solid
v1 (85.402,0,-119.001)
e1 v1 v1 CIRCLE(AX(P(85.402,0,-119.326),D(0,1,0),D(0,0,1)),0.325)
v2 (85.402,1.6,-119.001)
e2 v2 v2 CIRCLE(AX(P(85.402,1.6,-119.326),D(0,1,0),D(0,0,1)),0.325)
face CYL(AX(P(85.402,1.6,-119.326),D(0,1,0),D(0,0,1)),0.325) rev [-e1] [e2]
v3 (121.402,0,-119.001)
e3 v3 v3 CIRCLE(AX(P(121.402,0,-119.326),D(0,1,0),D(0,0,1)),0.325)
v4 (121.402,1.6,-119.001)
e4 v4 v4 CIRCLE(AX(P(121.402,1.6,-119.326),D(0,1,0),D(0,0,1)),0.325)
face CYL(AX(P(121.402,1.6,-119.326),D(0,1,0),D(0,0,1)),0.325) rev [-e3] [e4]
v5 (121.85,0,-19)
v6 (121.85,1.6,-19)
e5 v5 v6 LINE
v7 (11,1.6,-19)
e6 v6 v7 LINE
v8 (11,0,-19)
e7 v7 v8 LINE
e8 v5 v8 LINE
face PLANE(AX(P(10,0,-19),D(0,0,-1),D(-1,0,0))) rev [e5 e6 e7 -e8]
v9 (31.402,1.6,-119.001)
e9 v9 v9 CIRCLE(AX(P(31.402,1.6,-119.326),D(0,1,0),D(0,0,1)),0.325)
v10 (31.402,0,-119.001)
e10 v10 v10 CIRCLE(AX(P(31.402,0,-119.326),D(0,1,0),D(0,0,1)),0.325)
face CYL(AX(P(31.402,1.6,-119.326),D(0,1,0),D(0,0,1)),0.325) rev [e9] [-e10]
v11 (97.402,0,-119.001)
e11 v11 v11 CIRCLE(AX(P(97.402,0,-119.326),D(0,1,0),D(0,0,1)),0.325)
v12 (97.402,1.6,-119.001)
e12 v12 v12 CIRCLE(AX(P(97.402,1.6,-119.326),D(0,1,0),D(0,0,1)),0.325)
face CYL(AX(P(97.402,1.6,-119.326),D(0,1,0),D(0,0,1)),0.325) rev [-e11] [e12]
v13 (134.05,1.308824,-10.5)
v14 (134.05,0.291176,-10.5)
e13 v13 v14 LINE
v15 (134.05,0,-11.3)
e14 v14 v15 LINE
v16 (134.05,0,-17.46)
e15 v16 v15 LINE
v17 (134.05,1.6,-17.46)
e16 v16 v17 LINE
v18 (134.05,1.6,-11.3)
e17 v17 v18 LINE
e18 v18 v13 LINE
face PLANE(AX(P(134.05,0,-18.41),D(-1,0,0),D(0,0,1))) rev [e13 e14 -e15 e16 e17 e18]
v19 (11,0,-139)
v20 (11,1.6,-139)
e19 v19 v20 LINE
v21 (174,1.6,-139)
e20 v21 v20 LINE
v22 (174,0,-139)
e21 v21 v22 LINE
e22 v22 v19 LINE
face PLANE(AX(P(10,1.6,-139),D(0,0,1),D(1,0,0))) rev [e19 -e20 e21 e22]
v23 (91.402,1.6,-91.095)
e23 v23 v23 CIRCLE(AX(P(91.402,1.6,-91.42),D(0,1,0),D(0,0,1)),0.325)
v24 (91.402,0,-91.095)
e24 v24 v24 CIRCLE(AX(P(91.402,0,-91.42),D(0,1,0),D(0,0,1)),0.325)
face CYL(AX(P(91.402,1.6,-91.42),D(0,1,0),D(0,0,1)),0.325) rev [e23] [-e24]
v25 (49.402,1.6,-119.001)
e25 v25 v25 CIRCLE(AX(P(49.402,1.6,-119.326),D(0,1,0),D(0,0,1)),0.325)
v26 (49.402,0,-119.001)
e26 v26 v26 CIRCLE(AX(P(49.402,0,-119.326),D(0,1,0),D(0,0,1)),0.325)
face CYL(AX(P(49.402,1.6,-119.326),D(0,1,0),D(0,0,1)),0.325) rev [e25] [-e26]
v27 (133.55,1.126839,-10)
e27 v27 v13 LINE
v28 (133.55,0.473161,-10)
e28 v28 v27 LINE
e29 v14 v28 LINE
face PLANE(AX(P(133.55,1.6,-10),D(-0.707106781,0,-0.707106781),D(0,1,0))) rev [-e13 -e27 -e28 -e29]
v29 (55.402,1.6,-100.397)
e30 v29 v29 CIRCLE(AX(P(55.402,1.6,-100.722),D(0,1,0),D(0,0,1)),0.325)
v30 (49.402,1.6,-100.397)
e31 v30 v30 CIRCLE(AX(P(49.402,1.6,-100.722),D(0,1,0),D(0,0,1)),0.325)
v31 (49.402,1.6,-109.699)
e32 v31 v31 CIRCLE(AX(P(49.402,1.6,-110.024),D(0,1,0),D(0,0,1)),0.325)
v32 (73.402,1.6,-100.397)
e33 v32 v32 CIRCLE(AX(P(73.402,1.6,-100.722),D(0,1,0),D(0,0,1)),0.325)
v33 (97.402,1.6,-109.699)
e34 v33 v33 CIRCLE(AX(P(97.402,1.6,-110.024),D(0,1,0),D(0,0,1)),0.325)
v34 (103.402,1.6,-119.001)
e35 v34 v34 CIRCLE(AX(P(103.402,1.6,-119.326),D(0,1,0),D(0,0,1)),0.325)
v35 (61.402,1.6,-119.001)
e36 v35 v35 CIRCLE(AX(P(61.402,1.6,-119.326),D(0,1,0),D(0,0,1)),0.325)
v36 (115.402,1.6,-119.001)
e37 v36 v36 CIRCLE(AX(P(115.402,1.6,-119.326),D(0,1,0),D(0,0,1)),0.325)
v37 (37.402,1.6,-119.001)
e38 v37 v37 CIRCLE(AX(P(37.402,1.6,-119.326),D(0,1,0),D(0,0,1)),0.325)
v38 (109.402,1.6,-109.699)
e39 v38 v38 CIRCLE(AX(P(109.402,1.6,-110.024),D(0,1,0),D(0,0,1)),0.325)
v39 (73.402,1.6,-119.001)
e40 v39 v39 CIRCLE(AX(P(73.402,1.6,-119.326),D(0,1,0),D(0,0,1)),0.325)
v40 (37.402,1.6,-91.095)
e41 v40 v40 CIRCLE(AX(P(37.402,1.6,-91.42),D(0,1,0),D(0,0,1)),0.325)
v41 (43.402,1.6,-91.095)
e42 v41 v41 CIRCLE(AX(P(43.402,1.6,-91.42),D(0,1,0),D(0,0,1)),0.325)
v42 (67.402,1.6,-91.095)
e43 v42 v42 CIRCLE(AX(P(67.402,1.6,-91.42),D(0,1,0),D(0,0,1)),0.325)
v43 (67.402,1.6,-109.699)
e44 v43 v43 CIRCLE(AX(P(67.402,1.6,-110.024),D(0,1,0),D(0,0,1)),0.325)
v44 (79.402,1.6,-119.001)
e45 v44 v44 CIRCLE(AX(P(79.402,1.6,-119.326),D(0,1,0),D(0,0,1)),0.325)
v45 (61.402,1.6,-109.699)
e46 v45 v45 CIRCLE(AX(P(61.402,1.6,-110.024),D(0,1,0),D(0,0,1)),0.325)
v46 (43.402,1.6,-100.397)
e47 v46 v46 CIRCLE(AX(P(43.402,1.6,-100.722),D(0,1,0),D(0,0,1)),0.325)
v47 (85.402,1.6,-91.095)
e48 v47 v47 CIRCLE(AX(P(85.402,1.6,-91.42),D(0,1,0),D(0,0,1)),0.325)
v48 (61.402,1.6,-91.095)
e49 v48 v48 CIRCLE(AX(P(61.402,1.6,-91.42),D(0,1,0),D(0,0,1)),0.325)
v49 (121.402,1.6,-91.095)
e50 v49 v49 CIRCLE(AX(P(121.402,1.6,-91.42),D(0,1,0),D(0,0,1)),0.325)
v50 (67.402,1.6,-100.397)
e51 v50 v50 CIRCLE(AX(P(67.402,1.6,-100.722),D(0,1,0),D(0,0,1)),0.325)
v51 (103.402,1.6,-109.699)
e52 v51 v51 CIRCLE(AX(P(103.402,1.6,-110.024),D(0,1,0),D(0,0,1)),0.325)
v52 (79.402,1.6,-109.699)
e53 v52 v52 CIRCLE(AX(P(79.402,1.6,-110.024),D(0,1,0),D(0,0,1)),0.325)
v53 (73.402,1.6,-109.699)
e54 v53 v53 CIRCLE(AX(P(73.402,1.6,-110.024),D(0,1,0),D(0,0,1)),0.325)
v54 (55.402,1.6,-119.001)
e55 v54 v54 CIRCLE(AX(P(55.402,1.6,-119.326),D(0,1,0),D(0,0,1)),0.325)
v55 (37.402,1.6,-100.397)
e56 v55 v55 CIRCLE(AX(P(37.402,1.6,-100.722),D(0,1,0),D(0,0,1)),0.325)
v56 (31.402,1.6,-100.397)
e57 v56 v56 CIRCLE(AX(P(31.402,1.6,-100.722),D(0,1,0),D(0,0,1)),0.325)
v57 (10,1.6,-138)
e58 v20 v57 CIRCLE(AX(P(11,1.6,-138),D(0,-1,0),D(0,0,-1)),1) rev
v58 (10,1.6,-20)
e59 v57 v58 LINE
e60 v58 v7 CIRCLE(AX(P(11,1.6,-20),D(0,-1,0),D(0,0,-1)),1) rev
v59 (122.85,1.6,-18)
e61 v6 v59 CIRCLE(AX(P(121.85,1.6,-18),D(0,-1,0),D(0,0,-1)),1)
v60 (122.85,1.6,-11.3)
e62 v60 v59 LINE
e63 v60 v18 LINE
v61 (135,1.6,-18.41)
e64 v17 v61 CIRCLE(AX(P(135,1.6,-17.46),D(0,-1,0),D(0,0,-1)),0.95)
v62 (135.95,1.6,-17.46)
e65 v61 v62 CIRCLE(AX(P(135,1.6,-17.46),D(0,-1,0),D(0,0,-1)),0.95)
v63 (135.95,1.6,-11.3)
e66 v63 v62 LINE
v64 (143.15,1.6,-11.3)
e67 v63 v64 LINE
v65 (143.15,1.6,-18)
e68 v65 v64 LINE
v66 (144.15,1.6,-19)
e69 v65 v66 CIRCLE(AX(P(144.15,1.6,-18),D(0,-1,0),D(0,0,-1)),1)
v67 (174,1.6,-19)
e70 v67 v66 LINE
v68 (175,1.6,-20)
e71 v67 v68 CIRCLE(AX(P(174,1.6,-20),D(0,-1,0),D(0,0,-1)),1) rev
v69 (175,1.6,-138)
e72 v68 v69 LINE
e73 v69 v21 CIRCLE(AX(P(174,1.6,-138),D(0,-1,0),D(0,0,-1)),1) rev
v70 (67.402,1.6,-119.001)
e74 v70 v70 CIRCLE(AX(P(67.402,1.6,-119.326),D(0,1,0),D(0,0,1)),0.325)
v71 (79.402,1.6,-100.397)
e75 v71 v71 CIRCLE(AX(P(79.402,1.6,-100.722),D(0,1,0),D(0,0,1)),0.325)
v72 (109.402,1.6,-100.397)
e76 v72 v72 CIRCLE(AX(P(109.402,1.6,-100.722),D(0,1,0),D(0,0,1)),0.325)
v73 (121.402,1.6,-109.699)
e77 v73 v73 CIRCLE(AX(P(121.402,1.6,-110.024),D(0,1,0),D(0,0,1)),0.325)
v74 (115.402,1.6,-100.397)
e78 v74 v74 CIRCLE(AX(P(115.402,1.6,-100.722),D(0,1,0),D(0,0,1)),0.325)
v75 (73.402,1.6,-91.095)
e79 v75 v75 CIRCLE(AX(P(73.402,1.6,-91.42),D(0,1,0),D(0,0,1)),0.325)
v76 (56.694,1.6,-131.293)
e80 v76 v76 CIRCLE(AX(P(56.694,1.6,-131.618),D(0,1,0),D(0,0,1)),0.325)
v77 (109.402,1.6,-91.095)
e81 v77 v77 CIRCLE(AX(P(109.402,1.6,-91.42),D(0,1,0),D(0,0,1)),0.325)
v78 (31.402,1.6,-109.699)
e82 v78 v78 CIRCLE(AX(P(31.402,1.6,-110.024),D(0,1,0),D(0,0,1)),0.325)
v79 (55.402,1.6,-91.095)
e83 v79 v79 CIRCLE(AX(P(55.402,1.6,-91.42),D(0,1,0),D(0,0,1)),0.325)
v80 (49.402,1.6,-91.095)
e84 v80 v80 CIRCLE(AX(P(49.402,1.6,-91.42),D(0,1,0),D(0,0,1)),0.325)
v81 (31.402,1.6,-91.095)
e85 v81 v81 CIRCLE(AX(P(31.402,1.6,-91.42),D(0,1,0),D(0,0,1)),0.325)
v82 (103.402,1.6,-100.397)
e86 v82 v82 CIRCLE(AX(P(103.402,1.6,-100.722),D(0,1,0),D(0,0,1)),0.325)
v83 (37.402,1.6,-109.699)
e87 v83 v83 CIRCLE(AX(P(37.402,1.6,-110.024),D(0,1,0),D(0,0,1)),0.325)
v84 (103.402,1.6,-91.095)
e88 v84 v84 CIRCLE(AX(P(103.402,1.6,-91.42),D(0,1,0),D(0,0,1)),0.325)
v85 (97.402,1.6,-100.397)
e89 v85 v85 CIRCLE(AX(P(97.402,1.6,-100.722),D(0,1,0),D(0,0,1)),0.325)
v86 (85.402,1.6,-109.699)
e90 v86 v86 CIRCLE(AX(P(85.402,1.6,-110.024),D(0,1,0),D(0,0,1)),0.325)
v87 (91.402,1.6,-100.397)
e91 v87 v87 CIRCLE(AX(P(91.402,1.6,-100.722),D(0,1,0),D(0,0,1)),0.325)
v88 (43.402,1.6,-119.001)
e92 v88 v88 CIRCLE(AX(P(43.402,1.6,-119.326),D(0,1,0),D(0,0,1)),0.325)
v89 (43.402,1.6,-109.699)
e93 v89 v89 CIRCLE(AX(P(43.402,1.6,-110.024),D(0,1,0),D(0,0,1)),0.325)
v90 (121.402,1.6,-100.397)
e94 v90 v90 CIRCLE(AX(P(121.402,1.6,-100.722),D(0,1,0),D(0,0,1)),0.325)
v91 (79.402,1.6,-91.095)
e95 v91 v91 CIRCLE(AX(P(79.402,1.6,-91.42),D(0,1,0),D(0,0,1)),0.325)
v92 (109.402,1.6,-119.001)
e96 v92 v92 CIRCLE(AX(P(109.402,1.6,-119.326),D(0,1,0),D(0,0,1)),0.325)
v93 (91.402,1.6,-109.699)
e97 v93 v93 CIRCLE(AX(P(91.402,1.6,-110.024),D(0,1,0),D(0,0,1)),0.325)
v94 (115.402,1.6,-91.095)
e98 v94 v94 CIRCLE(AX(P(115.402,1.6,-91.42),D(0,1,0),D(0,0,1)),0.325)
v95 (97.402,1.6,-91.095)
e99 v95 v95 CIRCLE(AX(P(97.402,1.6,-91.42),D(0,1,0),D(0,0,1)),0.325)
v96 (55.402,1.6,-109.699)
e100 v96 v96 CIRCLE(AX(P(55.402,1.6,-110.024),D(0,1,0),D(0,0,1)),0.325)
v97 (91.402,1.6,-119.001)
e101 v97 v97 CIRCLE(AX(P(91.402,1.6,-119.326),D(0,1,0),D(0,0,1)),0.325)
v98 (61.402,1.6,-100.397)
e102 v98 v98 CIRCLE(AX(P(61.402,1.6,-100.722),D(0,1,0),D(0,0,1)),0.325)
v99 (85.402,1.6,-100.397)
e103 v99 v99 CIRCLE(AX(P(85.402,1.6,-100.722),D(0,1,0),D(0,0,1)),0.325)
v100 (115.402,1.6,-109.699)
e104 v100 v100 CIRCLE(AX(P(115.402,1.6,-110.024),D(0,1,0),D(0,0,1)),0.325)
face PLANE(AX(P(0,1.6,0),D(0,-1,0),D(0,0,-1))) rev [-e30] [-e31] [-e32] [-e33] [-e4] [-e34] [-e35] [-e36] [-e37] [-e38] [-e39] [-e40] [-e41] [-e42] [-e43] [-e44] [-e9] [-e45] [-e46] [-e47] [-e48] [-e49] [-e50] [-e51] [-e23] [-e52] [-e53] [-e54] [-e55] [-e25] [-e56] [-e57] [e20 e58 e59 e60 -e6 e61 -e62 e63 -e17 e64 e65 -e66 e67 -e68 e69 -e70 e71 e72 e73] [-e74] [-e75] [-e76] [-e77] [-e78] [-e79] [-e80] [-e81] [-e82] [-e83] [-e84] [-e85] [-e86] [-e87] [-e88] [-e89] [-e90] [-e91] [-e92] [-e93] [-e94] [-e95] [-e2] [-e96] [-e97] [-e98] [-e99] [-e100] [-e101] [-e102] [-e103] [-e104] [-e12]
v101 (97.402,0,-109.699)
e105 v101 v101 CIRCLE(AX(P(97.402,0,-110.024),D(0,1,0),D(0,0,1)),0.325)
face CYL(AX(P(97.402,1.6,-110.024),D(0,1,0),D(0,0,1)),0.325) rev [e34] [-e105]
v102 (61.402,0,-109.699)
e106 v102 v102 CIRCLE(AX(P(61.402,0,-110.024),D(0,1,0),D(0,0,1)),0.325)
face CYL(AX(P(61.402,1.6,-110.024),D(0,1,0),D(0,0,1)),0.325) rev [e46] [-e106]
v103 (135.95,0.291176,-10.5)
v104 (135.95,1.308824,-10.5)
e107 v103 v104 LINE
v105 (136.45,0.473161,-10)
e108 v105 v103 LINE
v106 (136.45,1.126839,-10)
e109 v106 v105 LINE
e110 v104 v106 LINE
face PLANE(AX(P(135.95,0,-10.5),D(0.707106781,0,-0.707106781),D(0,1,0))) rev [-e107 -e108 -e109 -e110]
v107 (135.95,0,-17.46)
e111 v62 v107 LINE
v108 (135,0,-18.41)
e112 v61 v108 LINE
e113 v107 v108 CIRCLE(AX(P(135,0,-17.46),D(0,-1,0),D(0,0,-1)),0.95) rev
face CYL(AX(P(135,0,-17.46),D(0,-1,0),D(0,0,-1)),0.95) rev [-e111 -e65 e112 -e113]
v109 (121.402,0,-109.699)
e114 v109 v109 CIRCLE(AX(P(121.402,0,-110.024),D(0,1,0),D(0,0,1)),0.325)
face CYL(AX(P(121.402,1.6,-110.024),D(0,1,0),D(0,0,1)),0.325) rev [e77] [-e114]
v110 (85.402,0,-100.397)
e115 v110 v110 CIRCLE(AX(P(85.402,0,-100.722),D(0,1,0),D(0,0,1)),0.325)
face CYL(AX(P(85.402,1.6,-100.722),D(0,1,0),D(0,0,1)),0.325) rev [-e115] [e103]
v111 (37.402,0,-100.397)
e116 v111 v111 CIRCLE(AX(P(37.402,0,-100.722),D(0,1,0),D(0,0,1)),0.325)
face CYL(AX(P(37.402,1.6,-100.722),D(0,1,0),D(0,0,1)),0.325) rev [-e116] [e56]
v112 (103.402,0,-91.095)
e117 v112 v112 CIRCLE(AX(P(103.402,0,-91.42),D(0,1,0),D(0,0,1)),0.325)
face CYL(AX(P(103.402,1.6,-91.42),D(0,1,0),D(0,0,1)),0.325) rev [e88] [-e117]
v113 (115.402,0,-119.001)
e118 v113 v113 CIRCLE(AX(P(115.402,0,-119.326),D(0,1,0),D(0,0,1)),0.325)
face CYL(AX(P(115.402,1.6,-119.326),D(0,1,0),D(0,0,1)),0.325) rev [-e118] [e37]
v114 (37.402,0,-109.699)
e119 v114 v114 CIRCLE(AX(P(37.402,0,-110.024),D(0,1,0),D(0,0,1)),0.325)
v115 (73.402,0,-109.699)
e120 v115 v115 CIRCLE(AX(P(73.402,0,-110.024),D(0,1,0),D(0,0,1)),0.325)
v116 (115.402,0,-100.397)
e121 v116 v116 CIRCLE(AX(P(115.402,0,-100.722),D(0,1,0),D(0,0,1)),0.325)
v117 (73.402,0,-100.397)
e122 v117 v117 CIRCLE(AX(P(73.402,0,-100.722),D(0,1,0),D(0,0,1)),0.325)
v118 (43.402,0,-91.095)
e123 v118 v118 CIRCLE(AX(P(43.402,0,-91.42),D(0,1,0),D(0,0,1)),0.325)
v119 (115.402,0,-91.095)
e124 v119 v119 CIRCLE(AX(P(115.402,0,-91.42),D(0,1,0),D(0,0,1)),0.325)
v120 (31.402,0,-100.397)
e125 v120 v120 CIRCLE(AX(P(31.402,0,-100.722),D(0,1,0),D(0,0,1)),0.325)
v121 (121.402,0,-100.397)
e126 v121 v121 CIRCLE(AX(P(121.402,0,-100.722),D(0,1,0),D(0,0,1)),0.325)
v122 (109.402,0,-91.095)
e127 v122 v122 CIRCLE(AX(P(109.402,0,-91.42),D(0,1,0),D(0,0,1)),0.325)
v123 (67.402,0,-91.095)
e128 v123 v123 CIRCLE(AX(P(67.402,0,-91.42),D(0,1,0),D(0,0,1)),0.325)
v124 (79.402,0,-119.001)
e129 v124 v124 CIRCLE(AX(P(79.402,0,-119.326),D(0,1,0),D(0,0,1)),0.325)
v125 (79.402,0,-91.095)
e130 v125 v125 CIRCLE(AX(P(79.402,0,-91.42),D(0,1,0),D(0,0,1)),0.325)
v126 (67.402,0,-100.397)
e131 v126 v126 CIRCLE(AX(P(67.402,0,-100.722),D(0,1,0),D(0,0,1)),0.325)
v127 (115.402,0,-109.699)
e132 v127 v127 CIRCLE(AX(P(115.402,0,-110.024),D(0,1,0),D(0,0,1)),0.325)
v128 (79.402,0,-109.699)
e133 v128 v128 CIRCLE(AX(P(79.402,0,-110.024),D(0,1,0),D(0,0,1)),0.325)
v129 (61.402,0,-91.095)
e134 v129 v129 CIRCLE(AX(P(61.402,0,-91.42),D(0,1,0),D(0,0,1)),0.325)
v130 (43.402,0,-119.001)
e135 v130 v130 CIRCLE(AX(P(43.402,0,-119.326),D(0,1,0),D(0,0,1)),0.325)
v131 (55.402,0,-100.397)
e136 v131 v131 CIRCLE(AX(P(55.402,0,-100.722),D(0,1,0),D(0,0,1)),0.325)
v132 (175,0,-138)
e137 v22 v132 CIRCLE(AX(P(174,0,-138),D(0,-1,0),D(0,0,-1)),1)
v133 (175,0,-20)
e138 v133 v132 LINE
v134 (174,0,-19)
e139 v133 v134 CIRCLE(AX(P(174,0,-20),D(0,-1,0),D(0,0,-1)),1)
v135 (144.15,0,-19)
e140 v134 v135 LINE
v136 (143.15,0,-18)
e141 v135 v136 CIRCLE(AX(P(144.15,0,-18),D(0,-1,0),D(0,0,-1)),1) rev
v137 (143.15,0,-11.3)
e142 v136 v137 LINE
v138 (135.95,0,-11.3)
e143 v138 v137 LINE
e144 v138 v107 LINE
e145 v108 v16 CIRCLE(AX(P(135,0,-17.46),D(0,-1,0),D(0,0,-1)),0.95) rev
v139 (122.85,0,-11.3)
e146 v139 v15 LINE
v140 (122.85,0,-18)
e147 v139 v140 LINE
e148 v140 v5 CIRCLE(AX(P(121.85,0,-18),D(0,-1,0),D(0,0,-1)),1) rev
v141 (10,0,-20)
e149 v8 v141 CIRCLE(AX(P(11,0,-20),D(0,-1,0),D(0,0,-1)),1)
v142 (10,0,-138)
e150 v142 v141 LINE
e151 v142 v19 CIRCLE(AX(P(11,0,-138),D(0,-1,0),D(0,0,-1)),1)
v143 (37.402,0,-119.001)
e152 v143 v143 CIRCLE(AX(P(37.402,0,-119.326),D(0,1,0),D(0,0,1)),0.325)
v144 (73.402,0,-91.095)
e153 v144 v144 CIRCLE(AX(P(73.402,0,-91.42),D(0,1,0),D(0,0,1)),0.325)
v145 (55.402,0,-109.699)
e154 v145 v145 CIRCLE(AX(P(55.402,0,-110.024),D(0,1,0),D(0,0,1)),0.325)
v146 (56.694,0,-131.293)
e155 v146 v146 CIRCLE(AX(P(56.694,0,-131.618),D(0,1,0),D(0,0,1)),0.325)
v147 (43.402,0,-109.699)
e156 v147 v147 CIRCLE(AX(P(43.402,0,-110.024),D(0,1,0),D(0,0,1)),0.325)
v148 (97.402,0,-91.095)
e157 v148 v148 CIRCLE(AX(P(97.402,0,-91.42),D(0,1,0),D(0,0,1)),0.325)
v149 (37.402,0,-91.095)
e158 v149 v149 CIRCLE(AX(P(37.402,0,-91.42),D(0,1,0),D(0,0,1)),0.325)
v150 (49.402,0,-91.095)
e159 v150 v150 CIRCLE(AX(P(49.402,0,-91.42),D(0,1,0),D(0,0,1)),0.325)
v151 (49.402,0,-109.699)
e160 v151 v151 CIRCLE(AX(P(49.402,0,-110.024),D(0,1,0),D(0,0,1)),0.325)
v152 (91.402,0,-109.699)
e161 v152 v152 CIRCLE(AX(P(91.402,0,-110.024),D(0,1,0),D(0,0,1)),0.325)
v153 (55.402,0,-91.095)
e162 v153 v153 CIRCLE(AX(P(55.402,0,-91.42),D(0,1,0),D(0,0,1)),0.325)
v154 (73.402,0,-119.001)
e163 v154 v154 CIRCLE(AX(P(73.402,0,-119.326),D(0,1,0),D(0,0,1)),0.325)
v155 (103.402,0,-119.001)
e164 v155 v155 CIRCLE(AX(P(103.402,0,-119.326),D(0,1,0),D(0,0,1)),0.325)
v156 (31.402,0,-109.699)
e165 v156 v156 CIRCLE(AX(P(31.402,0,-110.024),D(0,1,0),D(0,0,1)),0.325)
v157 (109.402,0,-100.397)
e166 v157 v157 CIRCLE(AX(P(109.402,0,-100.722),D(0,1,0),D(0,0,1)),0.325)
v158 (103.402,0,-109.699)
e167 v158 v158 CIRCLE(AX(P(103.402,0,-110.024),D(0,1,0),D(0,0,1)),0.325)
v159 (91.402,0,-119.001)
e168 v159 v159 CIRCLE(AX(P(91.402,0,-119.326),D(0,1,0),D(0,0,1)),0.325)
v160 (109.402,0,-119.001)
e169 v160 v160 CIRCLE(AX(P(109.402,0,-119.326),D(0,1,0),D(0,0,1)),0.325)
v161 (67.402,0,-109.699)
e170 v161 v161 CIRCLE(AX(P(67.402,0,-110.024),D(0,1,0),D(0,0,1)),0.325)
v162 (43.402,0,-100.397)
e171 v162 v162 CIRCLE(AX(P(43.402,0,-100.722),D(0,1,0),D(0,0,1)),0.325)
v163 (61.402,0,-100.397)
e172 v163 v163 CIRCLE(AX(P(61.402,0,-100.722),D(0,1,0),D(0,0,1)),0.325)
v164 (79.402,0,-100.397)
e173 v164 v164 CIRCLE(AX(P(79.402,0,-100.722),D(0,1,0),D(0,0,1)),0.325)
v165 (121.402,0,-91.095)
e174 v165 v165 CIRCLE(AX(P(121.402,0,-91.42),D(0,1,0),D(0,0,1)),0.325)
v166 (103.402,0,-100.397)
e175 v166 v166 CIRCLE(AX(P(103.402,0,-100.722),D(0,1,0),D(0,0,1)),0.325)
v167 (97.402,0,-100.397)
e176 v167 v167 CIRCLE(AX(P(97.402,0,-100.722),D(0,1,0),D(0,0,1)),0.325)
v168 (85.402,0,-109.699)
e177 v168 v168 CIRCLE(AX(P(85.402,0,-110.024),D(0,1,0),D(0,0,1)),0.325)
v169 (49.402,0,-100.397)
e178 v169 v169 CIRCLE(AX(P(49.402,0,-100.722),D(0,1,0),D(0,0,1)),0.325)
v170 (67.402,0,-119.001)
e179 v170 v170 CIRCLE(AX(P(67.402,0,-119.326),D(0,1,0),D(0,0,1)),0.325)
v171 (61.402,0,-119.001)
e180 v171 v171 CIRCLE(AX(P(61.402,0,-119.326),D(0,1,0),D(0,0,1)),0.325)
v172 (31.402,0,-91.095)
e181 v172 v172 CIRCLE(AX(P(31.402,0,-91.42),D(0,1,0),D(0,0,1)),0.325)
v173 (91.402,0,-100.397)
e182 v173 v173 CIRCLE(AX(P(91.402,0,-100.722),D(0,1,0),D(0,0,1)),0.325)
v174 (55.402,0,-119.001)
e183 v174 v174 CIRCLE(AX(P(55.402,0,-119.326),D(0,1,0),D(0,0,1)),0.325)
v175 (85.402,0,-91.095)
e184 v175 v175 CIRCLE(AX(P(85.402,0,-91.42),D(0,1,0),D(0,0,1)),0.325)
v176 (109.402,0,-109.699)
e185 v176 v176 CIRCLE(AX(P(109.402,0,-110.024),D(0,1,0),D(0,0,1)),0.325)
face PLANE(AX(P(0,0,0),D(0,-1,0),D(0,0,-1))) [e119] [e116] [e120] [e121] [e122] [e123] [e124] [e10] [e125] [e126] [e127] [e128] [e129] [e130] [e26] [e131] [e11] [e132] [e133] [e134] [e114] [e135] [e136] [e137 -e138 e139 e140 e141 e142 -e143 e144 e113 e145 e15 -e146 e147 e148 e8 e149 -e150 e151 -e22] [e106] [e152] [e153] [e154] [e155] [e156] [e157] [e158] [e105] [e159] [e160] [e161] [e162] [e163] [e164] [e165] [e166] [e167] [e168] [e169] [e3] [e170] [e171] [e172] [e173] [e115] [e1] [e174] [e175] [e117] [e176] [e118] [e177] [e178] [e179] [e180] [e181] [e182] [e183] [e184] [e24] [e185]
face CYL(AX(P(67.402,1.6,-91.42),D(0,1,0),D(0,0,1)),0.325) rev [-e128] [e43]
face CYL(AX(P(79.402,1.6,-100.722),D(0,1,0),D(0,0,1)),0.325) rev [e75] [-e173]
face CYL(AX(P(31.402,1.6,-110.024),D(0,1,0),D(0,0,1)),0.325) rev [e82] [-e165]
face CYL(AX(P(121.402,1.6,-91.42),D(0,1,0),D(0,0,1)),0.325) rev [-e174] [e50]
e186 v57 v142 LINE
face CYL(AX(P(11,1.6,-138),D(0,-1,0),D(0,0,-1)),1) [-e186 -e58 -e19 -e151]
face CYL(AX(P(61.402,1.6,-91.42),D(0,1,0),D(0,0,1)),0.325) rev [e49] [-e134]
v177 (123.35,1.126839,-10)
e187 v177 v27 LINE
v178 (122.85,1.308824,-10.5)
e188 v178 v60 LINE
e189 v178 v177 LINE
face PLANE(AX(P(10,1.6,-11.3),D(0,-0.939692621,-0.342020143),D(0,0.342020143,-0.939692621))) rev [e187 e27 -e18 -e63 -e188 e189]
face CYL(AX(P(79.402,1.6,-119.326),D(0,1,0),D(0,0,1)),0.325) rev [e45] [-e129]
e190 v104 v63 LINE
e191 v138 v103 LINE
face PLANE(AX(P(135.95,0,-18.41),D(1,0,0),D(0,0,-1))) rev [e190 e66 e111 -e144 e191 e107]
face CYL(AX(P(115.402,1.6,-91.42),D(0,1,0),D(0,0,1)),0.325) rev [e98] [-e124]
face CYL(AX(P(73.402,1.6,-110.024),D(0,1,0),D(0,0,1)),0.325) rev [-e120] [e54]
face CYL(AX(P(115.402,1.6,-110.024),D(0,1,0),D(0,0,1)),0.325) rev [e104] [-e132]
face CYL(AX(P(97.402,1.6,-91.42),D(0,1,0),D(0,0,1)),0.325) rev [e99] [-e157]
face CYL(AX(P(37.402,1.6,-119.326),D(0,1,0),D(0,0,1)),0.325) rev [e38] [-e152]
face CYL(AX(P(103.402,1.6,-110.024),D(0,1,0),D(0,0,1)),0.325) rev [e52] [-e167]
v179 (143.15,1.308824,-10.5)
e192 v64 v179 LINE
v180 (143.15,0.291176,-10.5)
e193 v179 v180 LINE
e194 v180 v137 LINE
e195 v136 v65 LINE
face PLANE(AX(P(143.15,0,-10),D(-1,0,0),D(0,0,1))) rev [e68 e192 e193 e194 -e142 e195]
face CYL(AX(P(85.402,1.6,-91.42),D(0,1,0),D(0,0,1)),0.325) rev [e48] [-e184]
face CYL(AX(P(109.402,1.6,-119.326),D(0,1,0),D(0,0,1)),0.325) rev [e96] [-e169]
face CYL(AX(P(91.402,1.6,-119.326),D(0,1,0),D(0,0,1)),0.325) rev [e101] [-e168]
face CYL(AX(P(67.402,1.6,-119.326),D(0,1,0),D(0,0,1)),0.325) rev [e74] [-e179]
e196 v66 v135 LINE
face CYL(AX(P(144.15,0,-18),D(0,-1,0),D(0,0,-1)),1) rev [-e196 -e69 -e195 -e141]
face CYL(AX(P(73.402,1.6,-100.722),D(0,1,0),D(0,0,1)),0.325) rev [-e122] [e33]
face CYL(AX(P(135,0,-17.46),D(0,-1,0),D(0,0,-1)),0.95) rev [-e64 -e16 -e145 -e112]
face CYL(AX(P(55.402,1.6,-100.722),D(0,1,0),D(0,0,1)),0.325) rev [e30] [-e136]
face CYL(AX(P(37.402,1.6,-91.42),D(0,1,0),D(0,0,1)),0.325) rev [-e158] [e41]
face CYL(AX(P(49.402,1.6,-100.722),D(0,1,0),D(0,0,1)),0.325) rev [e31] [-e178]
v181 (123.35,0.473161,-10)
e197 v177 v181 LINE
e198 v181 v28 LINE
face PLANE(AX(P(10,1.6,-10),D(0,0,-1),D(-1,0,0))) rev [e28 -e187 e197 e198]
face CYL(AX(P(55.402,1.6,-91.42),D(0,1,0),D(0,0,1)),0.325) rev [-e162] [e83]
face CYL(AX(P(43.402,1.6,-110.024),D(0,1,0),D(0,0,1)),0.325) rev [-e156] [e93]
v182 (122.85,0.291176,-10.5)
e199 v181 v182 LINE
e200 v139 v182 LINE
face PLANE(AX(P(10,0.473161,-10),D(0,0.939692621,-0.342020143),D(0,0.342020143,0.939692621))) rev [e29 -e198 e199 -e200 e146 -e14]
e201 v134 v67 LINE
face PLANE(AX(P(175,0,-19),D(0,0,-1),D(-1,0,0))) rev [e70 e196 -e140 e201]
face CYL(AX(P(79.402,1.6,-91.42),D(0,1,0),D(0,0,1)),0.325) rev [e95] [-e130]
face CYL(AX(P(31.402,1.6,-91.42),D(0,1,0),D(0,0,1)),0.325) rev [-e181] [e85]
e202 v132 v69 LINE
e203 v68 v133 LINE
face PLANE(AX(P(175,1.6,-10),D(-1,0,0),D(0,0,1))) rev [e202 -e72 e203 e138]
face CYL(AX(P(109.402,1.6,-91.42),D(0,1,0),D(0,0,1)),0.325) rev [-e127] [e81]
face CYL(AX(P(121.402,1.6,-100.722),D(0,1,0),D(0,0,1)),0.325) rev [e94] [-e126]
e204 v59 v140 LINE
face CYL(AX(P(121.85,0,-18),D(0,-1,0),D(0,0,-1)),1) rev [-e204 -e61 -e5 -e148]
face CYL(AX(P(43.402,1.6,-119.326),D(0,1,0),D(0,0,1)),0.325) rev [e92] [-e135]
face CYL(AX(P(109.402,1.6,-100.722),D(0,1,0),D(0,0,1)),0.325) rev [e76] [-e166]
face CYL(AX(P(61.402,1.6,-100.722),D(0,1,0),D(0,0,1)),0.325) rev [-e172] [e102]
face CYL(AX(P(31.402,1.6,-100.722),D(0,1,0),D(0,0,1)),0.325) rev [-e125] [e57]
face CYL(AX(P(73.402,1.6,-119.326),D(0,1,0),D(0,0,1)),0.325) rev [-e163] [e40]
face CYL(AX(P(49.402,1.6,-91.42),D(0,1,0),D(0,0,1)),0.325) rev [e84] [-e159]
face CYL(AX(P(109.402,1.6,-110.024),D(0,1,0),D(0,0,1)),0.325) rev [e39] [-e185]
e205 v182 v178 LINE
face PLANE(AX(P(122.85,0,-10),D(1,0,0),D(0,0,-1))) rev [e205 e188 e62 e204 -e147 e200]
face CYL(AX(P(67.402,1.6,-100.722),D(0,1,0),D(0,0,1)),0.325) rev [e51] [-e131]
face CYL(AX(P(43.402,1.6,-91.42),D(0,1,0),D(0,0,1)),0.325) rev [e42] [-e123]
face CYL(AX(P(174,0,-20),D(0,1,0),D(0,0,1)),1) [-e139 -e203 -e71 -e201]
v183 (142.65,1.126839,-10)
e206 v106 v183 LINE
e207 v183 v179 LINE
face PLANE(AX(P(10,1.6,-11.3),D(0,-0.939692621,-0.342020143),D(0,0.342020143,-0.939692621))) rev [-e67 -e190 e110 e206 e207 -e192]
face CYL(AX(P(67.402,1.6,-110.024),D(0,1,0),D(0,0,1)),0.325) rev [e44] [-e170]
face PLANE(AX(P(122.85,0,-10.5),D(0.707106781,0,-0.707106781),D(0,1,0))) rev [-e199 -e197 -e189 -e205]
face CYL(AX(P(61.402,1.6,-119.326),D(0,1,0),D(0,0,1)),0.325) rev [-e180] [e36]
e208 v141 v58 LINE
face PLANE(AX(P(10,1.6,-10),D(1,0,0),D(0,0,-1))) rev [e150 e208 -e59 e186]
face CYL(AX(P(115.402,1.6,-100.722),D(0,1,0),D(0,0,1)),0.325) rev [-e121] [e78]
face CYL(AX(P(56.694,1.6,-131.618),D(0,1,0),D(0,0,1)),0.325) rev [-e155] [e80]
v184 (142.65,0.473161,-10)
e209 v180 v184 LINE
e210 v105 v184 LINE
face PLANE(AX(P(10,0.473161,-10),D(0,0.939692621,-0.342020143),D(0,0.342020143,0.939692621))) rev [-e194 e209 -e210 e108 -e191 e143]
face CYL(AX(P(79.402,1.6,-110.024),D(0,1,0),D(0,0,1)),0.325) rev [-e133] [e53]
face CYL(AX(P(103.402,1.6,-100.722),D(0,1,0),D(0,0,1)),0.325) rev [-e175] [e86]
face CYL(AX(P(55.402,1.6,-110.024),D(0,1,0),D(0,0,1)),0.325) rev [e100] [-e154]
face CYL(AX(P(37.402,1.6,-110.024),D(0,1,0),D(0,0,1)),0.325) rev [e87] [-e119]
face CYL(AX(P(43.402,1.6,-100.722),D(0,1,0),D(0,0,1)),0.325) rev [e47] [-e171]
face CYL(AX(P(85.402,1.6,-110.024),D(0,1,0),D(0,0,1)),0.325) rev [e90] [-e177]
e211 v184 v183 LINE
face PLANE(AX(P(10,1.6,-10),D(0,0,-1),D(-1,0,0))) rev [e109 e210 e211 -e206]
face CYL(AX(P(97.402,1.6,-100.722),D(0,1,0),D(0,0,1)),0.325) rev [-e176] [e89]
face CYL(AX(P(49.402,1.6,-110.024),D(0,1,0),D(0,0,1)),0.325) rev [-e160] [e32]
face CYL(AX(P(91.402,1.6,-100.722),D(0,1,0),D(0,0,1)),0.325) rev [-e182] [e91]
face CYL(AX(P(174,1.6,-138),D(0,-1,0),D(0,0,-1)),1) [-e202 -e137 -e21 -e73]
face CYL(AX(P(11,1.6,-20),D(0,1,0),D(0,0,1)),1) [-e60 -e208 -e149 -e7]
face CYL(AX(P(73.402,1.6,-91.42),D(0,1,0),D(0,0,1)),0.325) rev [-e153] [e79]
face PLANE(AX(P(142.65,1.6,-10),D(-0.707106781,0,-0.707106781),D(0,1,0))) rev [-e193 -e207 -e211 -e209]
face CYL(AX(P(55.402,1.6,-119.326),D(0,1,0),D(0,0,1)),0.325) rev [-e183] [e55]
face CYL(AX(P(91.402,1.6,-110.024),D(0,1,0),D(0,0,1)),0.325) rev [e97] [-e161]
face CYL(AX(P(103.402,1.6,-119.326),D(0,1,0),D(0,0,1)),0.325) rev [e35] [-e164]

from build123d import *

# Parameters (mm, degrees)
SKETCH1_W                    = 165
SKETCH1_H                    = 129
BOSS_EXTRUDE1_DEPTH          = 1.6
SKETCH2_W                    = 112.85
SKETCH2_H                    = 9
CUT_EXTRUDE1_DEPTH           = 224.491744814
SKETCH3_W                    = 31.85
SKETCH3_H                    = 9
CUT_EXTRUDE2_DEPTH           = 224.491744814
SKETCH4_W                    = 1.9
SKETCH4_H                    = 8.41
CUT_EXTRUDE3_DEPTH           = 224.491744814
FILLET1_R                    = 1
FILLET2_R                    = 0.95
CHAMFER1_SIZE                = 0.5
F_0_65_0_65_DIAMETER_HOLE1_D = 0.65
LPATTERN1_COUNT              = 16
LPATTERN1_PITCH              = 6
LPATTERN1_COUNT_DIR2         = 4
LPATTERN1_PITCH_DIR2         = 9.302
F_0_65_0_65_DIAMETER_HOLE2_D = 0.65
CUT_EXTRUDE4_DEPTH           = 216.751152952


with BuildPart() as part:
    # Sketch1 → Boss-Extrude1 (new body)
    with BuildSketch(Plane(origin=(0, 0, 0), x_dir=(1, 0, 0), z_dir=(0, 1, 0))):
        with Locations((92.5, 74.5)):
            Rectangle(SKETCH1_W, SKETCH1_H)
    extrude(amount=BOSS_EXTRUDE1_DEPTH)

    # Sketch2 → Cut-Extrude1 (cut, through all)
    with BuildSketch(Plane(origin=(0, 1.6, 0), x_dir=(1, 0, 0), z_dir=(0, 1, 0))):
        with Locations((66.425, 14.5)):
            Rectangle(SKETCH2_W, SKETCH2_H)
    extrude(amount=-CUT_EXTRUDE1_DEPTH, mode=Mode.SUBTRACT)

    # Sketch3 → Cut-Extrude2 (cut, through all)
    with BuildSketch(Plane(origin=(0, 1.6, 0), x_dir=(1, 0, 0), z_dir=(0, 1, 0))):
        with Locations((159.075, 14.5)):
            Rectangle(SKETCH3_W, SKETCH3_H)
    extrude(amount=-CUT_EXTRUDE2_DEPTH, mode=Mode.SUBTRACT)

    # Sketch4 → Cut-Extrude3 (cut, through all)
    with BuildSketch(Plane(origin=(0, 1.6, 0), x_dir=(1, 0, 0), z_dir=(0, 1, 0))):
        with Locations((135, 14.205)):
            Rectangle(SKETCH4_W, SKETCH4_H)
    extrude(amount=-CUT_EXTRUDE3_DEPTH, mode=Mode.SUBTRACT)

    # Fillet1
    fillet1_edges = [part.edges().sort_by_distance(p)[0] for p in [
        (10, 0.8, -19),
        (122.85, 0.8, -19),
        (175, 0.8, -19),
        (143.15, 0.8, -19),
        (10, 0.8, -139),
        (175, 0.8, -139),
    ]]
    fillet(fillet1_edges, radius=FILLET1_R)

    # Fillet2
    fillet2_edges = [part.edges().sort_by_distance(p)[0] for p in [
        (135.95, 0.8, -18.41),
        (134.05, 0.8, -18.41),
    ]]
    fillet(fillet2_edges, radius=FILLET2_R - 0.0001)  # a hair under: the kernel refuses the full size

    # Chamfer1
    chamfer1_edges = [part.edges().sort_by_distance(p)[0] for p in [
        (122.85, 0.8, -10),
        (143.15, 0.8, -10),
        (135.95, 0.8, -10),
        (134.05, 0.8, -10),
    ]]
    chamfer(chamfer1_edges, length=CHAMFER1_SIZE)

    # Ø0.65 (0.65) Diameter Hole1 (through all)
    with Locations(Plane(origin=(0, 1.6, 0), x_dir=(1, 0, 0), z_dir=(0, 1, 0))):
        with Locations((31.402, 91.42)):
            f_0_65_0_65_diameter_hole1 = Hole(F_0_65_0_65_DIAMETER_HOLE1_D / 2)

    # LPattern1: 0.65 _0.65_ Diameter Hole1 16 × 4
    with Locations(*[(i * LPATTERN1_PITCH, 0, -j * LPATTERN1_PITCH_DIR2) for i in range(LPATTERN1_COUNT) for j in range(LPATTERN1_COUNT_DIR2) if (i, j) != (0, 0)]):
        add(f_0_65_0_65_diameter_hole1, mode=Mode.SUBTRACT)

    # Ø0.65 (0.65) Diameter Hole2 (through all)
    with Locations(Plane(origin=(0, 1.6, 0), x_dir=(1, 0, 0), z_dir=(0, 1, 0))):
        with Locations((56.694, 131.618)):
            Hole(F_0_65_0_65_DIAMETER_HOLE2_D / 2)

    # Sketch11 → Cut-Extrude4 (cut, through all)
    with BuildSketch(Plane(origin=(175, 0, 0), x_dir=(0, 0, -1), z_dir=(1, 0, 0))):
        Polygon((11.3, 1.6), (10, 1.126838695), (10, 1.6), align=None)
        Polygon((11.3, 0), (10, 0), (10, 0.473161305), align=None)
    extrude(amount=-CUT_EXTRUDE4_DEPTH, mode=Mode.SUBTRACT)


solid = part.part
